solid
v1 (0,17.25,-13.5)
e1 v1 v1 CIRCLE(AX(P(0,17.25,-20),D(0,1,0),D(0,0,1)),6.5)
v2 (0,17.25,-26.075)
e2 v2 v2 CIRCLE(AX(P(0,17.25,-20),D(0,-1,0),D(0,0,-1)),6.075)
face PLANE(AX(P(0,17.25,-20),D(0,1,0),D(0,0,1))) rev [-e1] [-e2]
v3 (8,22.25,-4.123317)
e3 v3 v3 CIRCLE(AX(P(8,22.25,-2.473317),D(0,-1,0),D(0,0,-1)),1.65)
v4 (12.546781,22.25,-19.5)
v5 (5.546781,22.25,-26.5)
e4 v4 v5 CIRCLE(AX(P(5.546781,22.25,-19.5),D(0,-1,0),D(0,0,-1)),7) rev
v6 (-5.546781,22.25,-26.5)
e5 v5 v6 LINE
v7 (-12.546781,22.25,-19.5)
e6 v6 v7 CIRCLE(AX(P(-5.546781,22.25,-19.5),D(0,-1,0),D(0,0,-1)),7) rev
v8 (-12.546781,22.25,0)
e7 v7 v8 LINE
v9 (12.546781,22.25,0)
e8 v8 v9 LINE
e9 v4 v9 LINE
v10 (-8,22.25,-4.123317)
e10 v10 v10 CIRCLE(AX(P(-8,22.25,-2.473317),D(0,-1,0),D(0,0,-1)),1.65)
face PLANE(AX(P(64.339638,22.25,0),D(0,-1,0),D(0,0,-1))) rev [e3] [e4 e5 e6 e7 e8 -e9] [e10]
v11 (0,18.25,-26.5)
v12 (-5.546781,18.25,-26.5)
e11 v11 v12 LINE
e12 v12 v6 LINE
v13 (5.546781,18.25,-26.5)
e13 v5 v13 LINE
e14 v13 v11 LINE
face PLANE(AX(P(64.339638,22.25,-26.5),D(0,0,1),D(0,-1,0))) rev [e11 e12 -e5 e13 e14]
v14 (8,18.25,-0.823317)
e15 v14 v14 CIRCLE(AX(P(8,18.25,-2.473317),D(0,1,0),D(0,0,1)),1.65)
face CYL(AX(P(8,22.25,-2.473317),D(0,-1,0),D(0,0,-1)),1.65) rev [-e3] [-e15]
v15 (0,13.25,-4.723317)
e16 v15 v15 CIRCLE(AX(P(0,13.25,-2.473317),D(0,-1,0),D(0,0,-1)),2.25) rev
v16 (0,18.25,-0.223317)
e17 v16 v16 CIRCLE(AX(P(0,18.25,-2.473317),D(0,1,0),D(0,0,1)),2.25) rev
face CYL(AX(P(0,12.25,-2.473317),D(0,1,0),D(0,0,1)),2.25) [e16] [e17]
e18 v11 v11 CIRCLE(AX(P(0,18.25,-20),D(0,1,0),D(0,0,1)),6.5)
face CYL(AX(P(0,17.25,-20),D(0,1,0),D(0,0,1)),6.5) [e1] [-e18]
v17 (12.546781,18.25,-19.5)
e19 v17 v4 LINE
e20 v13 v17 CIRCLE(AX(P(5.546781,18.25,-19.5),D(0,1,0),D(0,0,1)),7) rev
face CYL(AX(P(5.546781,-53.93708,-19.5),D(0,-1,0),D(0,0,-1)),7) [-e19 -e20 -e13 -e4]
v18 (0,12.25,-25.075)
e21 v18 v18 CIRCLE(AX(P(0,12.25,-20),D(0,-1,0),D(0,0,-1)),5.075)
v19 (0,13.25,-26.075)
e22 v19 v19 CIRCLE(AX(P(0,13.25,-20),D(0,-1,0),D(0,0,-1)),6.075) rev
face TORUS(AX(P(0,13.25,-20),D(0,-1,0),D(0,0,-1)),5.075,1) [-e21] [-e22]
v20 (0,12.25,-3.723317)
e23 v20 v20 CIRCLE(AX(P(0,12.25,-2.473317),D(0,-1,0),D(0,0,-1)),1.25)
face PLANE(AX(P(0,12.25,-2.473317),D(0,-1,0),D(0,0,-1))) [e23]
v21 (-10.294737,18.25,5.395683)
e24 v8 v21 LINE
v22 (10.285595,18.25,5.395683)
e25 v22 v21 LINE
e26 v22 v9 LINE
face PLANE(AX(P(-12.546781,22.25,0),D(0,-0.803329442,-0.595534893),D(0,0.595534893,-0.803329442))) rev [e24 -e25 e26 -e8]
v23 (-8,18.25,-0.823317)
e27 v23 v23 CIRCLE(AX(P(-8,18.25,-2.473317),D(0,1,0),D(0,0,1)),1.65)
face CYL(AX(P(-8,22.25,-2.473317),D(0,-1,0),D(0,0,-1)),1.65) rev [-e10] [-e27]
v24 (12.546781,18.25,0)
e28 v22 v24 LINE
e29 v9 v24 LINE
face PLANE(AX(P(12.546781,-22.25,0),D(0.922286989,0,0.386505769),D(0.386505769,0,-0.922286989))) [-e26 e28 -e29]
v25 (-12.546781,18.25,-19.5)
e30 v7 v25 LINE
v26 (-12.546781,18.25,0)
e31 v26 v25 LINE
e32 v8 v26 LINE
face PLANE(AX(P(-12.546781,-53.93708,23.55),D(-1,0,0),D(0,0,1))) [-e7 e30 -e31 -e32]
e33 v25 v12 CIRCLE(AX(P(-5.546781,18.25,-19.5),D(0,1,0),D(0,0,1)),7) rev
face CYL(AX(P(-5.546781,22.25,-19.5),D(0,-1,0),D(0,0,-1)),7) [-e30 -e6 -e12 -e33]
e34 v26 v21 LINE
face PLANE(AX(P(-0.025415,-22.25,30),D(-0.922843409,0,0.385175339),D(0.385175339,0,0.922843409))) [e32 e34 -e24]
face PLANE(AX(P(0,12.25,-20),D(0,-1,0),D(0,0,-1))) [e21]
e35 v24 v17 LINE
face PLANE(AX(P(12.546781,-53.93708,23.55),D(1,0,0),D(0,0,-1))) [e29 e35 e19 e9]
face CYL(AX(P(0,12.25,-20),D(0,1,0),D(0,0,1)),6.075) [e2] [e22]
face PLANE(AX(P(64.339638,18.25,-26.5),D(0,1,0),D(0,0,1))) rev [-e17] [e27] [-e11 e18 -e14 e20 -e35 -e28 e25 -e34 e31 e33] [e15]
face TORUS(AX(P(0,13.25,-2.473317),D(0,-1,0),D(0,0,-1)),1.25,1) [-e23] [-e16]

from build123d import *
from OCP.BRepFilletAPI import BRepFilletAPI_MakeChamfer

# Parameters (mm, degrees)
SKETCH4_W                = 12.46
SKETCH4_H                = 17.25
BOSS_EXTRUDE3_DEPTH      = 6
BOSS_EXTRUDE6_DEPTH      = 7.3
BOSS_EXTRUDE6_DEPTH_BACK = 17.25
SKETCH8_R                = 12.546781182
SKETCH8_R_2              = 11.15
BOSS_EXTRUDE4_DEPTH      = 17.25
SKETCH6_R                = 2
CUT_EXTRUDE1_DEPTH       = 5
CHAMFER1_SIZE            = 0.5
CHAMFER1_SIZE_2          = 0.866025404
SKETCH10_W               = 12.46
SKETCH10_H               = 23.7
CUT_EXTRUDE3_DEPTH       = 17.25
CUT_EXTRUDE4_REACH       = 43.938
SKETCH11_W               = 5
SKETCH11_H               = 3
BOSS_EXTRUDE7_START      = -7.3
BOSS_EXTRUDE7_DEPTH      = 7.3
BOSS_EXTRUDE9_START      = 10
BOSS_EXTRUDE9_DEPTH      = 10
BOSS_EXTRUDE10_DEPTH     = 25.093562364
SKETCH18_W               = 21.5
SKETCH18_H               = 12.438292938
CUT_EXTRUDE5_DEPTH       = 2
CUT_EXTRUDE6_DEPTH       = 58.154608998
CUT_EXTRUDE6_DEPTH_BACK  = 58.154608998
SKETCH19_R               = 3.5
FILLET1_R                = 7
CUT_EXTRUDE7_DEPTH       = 55.97840444
CUT_EXTRUDE7_DEPTH_BACK  = 55.97840444
SKETCH20_W               = 25.093562364
SKETCH20_H               = 36.096781182
BOSS_EXTRUDE11_DEPTH     = 44.5
CUT_EXTRUDE8_DEPTH       = 40.401576339
CUT_EXTRUDE8_DEPTH_BACK  = 40.401576339
CUT_EXTRUDE9_DEPTH       = 40.401576339
SKETCH24_R               = 6.5
BOSS_EXTRUDE12_DEPTH     = 5
SKETCH25_R               = 6.075
BOSS_EXTRUDE13_DEPTH     = 5
FILLET2_R                = 1
BOSS_EXTRUDE14_DEPTH     = 2
CUT_EXTRUDE10_REACH      = 57.104
SKETCH27_R               = 0.75
CUT_EXTRUDE11_DEPTH      = 45.983908275
CUT_EXTRUDE11_DEPTH_BACK = 45.983908275
CUT_EXTRUDE12_DEPTH      = 30.927775026
CUT_EXTRUDE12_DEPTH_BACK = 30.927775026
SKETCH29_R               = 1.65
SKETCH30_R               = 2.25
BOSS_EXTRUDE15_DEPTH     = 6
FILLET3_R                = 1


with BuildPart() as part:
    # Sketch4 → Boss-Extrude3 (new body)
    with BuildSketch(Plane.XY):
        with Locations((0, -1.35)):
            Rectangle(SKETCH4_W, SKETCH4_H)
    extrude(amount=BOSS_EXTRUDE3_DEPTH)



with BuildPart() as body_2:
    # Sketch8 → Boss-Extrude6 (new, two sides: drawn at the far end of the back side and taken through both)
    with BuildSketch(Plane(origin=(0, -9.975, 0), x_dir=(-1, 0, 0), z_dir=(0, -1, 0)).offset(-BOSS_EXTRUDE6_DEPTH_BACK)):
        with Locations(Location((0, -23.55, 0), (0, 0, 90))):
            Circle(SKETCH8_R)
        with Locations(Location((0, -23.55, 0), (0, 0, 90))):
            Circle(SKETCH8_R_2, mode=Mode.SUBTRACT)
    extrude(amount=BOSS_EXTRUDE6_DEPTH + BOSS_EXTRUDE6_DEPTH_BACK)


with BuildPart() as part_1:
    add(part.part)

    add(body_2.part)  # Boss-Extrude4 merges body 2
    # Sketch5 → Boss-Extrude4 (add)
    with BuildSketch(Plane(origin=(0, 7.275, 0), x_dir=(1, 0, 0), z_dir=(0, 1, 0))):
        with BuildLine():
            Line((12.546781182, -23.55), (12.546781182, 0))
            Line((12.546781182, 0), (6.23, 0))
            Line((6.23, 0), (6.23, -29.7))
            Line((6.23, -29.7), (-6.23, -29.7))
            Line((-6.23, -29.7), (-6.23, 0))
            Line((-6.23, 0), (-12.546781182, 0))
            Line((-12.546781182, 0), (-12.546781182, -23.55))
            ThreePointArc((-12.546781182, -23.55), (0, -36.096781182), (12.546781182, -23.55))
        make_face()
    extrude(amount=-BOSS_EXTRUDE4_DEPTH)

    # Sketch6 → Cut-Extrude1 (cut)
    with BuildSketch(Plane(origin=(0, 7.275, 0), x_dir=(1, 0, 0), z_dir=(0, 1, 0))):
        with Locations(Location((0, -3.5, 0), (0, 0, 270))):
            Circle(SKETCH6_R)
        with Locations(Location((0, -32.2, 0), (0, 0, 270))):
            Circle(SKETCH6_R)
    extrude(amount=-CUT_EXTRUDE1_DEPTH, mode=Mode.SUBTRACT)

    # Chamfer1
    chamfer1_edges_1 = [part_1.edges().sort_by_distance(p)[0] for p in [
        (0, 7.275, 1.5),
    ]]
    chamfer1_side_1 = [part_1.faces().sort_by_distance(p)[0] for p in [
        (0, 7.275, 1.49),
    ]]
    chamfer1_edges_2 = [part_1.edges().sort_by_distance(p)[0] for p in [
        (0, 7.275, 30.2),
    ]]
    chamfer1_side_2 = [part_1.faces().sort_by_distance(p)[0] for p in [
        (0, 7.275, 30.19),
    ]]
    chamfer1 = BRepFilletAPI_MakeChamfer(part_1.part.solid().wrapped)
    for e in chamfer1_edges_1:
        chamfer1.Add(CHAMFER1_SIZE - 0.0001, CHAMFER1_SIZE_2 - 0.0001, e.wrapped, chamfer1_side_1[0].wrapped)
    for e in chamfer1_edges_2:
        chamfer1.Add(CHAMFER1_SIZE - 0.0001, CHAMFER1_SIZE_2 - 0.0001, e.wrapped, chamfer1_side_2[0].wrapped)
    add(Compound.cast(chamfer1.Shape()), mode=Mode.REPLACE)  # a hair under: the kernel refuses the full size

    # Sketch10 → Cut-Extrude3 (cut)
    with BuildSketch(Plane(origin=(0, 7.275, 0), x_dir=(1, 0, 0), z_dir=(0, 1, 0))):
        with Locations((0, -17.85)):
            Rectangle(SKETCH10_W, SKETCH10_H)
    extrude(amount=-CUT_EXTRUDE3_DEPTH, mode=Mode.SUBTRACT)

    # Sketch11 → Cut-Extrude4 (cut, up to next)
    with BuildSketch(Plane.XY.offset(36.096781182), mode=Mode.PRIVATE) as cut_extrude4_sk1:
        with Locations((0, -8.475)):
            Rectangle(SKETCH11_W, SKETCH11_H)
    cut_extrude4_tool1 = extrude(cut_extrude4_sk1.sketch, amount=-CUT_EXTRUDE4_REACH, mode=Mode.PRIVATE) & part_1.part
    add(cut_extrude4_tool1.solids().sort_by_distance((0, -8.475, 36.096781))[0], mode=Mode.SUBTRACT)

    # Sketch13 → Boss-Extrude7 (add)
    with BuildSketch(Plane.XZ.offset(17.275).offset(BOSS_EXTRUDE7_START)):
        with BuildLine():
            Line((-12.546781182, 23.55), (-12.546781182, 0))
            Line((-12.546781182, 0), (12.546781182, 0))
            Line((12.546781182, 0), (12.546781182, 23.55))
            ThreePointArc((12.546781182, 23.55), (0, 11.003218818), (-12.546781182, 23.55))
        make_face()
    extrude(amount=BOSS_EXTRUDE7_DEPTH)

    # Sketch15 → Boss-Extrude9 (add)
    with BuildSketch(Plane(origin=(0, 7.275, 0), x_dir=(1, 0, 0), z_dir=(0, 1, 0)).offset(BOSS_EXTRUDE9_START)):
        with BuildLine():
            Line((-12.546781182, 0), (12.546781182, 0))
            Line((12.546781182, 0), (12.546781182, -23.55))
            ThreePointArc((12.546781182, -23.55), (0, -36.096781182), (-12.546781182, -23.55))
            Line((-12.546781182, -23.55), (-12.546781182, 0))
        make_face()
        with BuildLine():
            Line((-6.23, -0.8), (6.23, -0.8))
            Line((6.23, -0.8), (6.23, -33.5))
            ThreePointArc((6.23, -33.5), (5.937106781, -34.207106781), (5.23, -34.5))
            Line((5.23, -34.5), (-5.23, -34.5))
            ThreePointArc((-5.23, -34.5), (-5.937106781, -34.207106781), (-6.23, -33.5))
            Line((-6.23, -33.5), (-6.23, -0.8))
        make_face(mode=Mode.SUBTRACT)
    extrude(amount=-BOSS_EXTRUDE9_DEPTH)

    # Sketch17 → Boss-Extrude10 (add)
    with BuildSketch(Plane(origin=(-12.546781182, 4.728218818, 0), x_dir=(0, -1, 0), z_dir=(1, 0, 0))):
        Polygon((26.978218818, 26.5), (26.978218818, 0), (-17.521781182, 0), (-17.521781182, 26.5), (-13.521781182, 26.5), (-13.521781182, 5), (22.978218818, 5), (22.978218818, 26.5), align=None)
    extrude(amount=BOSS_EXTRUDE10_DEPTH)

    # Sketch18 → Cut-Extrude5 (cut)
    with BuildSketch(Plane.ZX.offset(-18.25)):
        with Locations((-15.75, 0)):
            Rectangle(SKETCH18_W, SKETCH18_H)
    extrude(amount=-CUT_EXTRUDE5_DEPTH, mode=Mode.SUBTRACT)

    # Sketch19 → Cut-Extrude6 (cut, two sides: drawn at the far end of the back side and taken through both)
    with BuildSketch(Plane.ZX.offset(-20.25).offset(-CUT_EXTRUDE6_DEPTH_BACK)):
        with Locations((-20, 0)):
            Circle(SKETCH19_R)
    extrude(amount=CUT_EXTRUDE6_DEPTH + CUT_EXTRUDE6_DEPTH_BACK, mode=Mode.SUBTRACT)

    # Fillet1
    fillet1_edges = [part_1.edges().sort_by_distance(p)[0] for p in [
        (12.546781182, -20.25, -26.5),
        (-12.546781182, -20.25, -26.5),
        (-12.546781182, 20.25, -26.5),
        (12.546781182, 20.25, -26.5),
    ]]
    fillet(fillet1_edges, radius=FILLET1_R)

    # Sketch20 → Cut-Extrude7 (cut, two sides: drawn at the far end of the back side and taken through both)
    with BuildSketch(Plane(origin=(0, 17.275, 0), x_dir=(1, 0, 0), z_dir=(0, 1, 0)).offset(-CUT_EXTRUDE7_DEPTH_BACK)):
        with Locations((0, -18.048390591)):
            Rectangle(SKETCH20_W, SKETCH20_H)
    extrude(amount=CUT_EXTRUDE7_DEPTH + CUT_EXTRUDE7_DEPTH_BACK, mode=Mode.SUBTRACT)

    # Sketch21 → Boss-Extrude11 (add)
    with BuildSketch(Plane(origin=(0, 22.25, 0), x_dir=(1, 0, 0), z_dir=(0, 1, 0))):
        Polygon((12.546781182, 0), (-0.025415104, -30), (-12.546781182, 0), align=None)
    extrude(amount=-BOSS_EXTRUDE11_DEPTH)

    # Sketch22 → Cut-Extrude8 (cut, two sides: drawn at the far end of the back side and taken through both)
    with BuildSketch(Plane(origin=(0, 0, 0), x_dir=(0, 0, -1), z_dir=(1, 0, 0)).offset(-CUT_EXTRUDE8_DEPTH_BACK)):
        Polygon((0, 22.25), (-30, 0.01), (-30, 22.25), align=None)
        Polygon((0, -22.25), (-30, -22.25), (-30, -0.01), align=None)
    extrude(amount=CUT_EXTRUDE8_DEPTH + CUT_EXTRUDE8_DEPTH_BACK, mode=Mode.SUBTRACT)

    # Sketch23 → Cut-Extrude9 (cut, through all)
    with BuildSketch(Plane(origin=(0, 0, 0), x_dir=(-1, 0, 0), z_dir=(0, 0, -1))):
        Polygon((12.546781182, 18.25), (0, 0), (12.546781182, -22.25), align=None)
    extrude(amount=-CUT_EXTRUDE9_DEPTH, mode=Mode.SUBTRACT)

    # Sketch24 → Boss-Extrude12 (add)
    with BuildSketch(Plane(origin=(0, 22.25, 0), x_dir=(1, 0, 0), z_dir=(0, 1, 0))):
        with Locations(Location((0, 20, 0), (0, 0, 270))):
            Circle(SKETCH24_R)
    extrude(amount=-BOSS_EXTRUDE12_DEPTH)

    # Sketch25 → Boss-Extrude13 (add)
    with BuildSketch(Plane.XZ.offset(-17.25)):
        with Locations(Location((0, -20, 0), (0, 0, 270))):
            Circle(SKETCH25_R)
    extrude(amount=BOSS_EXTRUDE13_DEPTH)

    # Fillet2
    fillet2_edges = [part_1.edges().sort_by_distance(p)[0] for p in [
        (0, 12.25, -13.925),
    ]]
    fillet(fillet2_edges, radius=FILLET2_R)

    # Sketch26 → Boss-Extrude14 (add)
    with BuildSketch(Plane(origin=(0, -20.25, 0), x_dir=(1, 0, 0), z_dir=(0, 1, 0))):
        Polygon((-6.219146469, 5), (-2.5, 5), (-3.1585, 20), (-3.44385, 26.5), (-6.219146469, 26.5), align=None)
        Polygon((3.1585, 20), (3.44385, 26.5), (6.219146469, 26.5), (6.219146469, 5), (2.5, 5), align=None)
    extrude(amount=BOSS_EXTRUDE14_DEPTH)

    # Sketch27 → Cut-Extrude10 (cut, up to next)
    with BuildSketch(Plane.XZ.offset(22.25), mode=Mode.PRIVATE) as cut_extrude10_sk1:
        with Locations(Location((0, -10, 0), (0, 0, 270))):
            Circle(SKETCH27_R)
    cut_extrude10_tool1 = extrude(cut_extrude10_sk1.sketch, amount=-CUT_EXTRUDE10_REACH, mode=Mode.PRIVATE) & part_1.part
    # Sketch27 → Cut-Extrude10 (cut, up to next)
    with BuildSketch(Plane.XZ.offset(22.25), mode=Mode.PRIVATE) as cut_extrude10_sk2:
        with Locations(Location((0, -7.5, 0), (0, 0, 270))):
            Circle(SKETCH27_R)
    cut_extrude10_tool2 = extrude(cut_extrude10_sk2.sketch, amount=-CUT_EXTRUDE10_REACH, mode=Mode.PRIVATE) & part_1.part
    # Sketch27 → Cut-Extrude10 (cut, up to next)
    with BuildSketch(Plane.XZ.offset(22.25), mode=Mode.PRIVATE) as cut_extrude10_sk3:
        with Locations(Location((0, -12.5, 0), (0, 0, 270))):
            Circle(SKETCH27_R)
    cut_extrude10_tool3 = extrude(cut_extrude10_sk3.sketch, amount=-CUT_EXTRUDE10_REACH, mode=Mode.PRIVATE) & part_1.part
    add(cut_extrude10_tool1.solids().sort_by_distance((0, -22.25, -10))[0], mode=Mode.SUBTRACT)
    add(cut_extrude10_tool2.solids().sort_by_distance((0, -22.25, -7.5))[0], mode=Mode.SUBTRACT)
    add(cut_extrude10_tool3.solids().sort_by_distance((0, -22.25, -12.5))[0], mode=Mode.SUBTRACT)

    # Sketch28 → Cut-Extrude11 (cut, two sides: drawn at the far end of the back side and taken through both)
    with BuildSketch(Plane(origin=(12.546781182, 0, 0), x_dir=(0, 0, -1), z_dir=(1, 0, 0)).offset(-CUT_EXTRUDE11_DEPTH_BACK)):
        Polygon((5, 18.25), (-35.232883585, 18.25), (-35.232883585, -25.616523732), (31.598677018, -25.616523732), (31.598677018, 10.892065209), (5, 10.892065209), align=None)
    extrude(amount=CUT_EXTRUDE11_DEPTH + CUT_EXTRUDE11_DEPTH_BACK, mode=Mode.SUBTRACT)

    # Sketch29 → Cut-Extrude12 (cut, two sides: drawn at the far end of the back side and taken through both)
    with BuildSketch(Plane.XZ.offset(-18.25).offset(-CUT_EXTRUDE12_DEPTH_BACK)):
        with Locations(Location((-8, -2.473316547, 0), (0, 0, 270))):
            Circle(SKETCH29_R)
        with Locations(Location((8, -2.473316547, 0), (0, 0, 270))):
            Circle(SKETCH29_R)
    extrude(amount=CUT_EXTRUDE12_DEPTH + CUT_EXTRUDE12_DEPTH_BACK, mode=Mode.SUBTRACT)

    # Sketch30 → Boss-Extrude15 (add)
    with BuildSketch(Plane.XZ.offset(-18.25)):
        with Locations(Location((0, -2.473316547, 0), (0, 0, 90))):
            Circle(SKETCH30_R)
    extrude(amount=BOSS_EXTRUDE15_DEPTH)

    # Fillet3
    fillet3_edges = [part_1.edges().sort_by_distance(p)[0] for p in [
        (0, 12.25, -4.723316547),
    ]]
    fillet(fillet3_edges, radius=FILLET3_R)


solid = part_1.part
